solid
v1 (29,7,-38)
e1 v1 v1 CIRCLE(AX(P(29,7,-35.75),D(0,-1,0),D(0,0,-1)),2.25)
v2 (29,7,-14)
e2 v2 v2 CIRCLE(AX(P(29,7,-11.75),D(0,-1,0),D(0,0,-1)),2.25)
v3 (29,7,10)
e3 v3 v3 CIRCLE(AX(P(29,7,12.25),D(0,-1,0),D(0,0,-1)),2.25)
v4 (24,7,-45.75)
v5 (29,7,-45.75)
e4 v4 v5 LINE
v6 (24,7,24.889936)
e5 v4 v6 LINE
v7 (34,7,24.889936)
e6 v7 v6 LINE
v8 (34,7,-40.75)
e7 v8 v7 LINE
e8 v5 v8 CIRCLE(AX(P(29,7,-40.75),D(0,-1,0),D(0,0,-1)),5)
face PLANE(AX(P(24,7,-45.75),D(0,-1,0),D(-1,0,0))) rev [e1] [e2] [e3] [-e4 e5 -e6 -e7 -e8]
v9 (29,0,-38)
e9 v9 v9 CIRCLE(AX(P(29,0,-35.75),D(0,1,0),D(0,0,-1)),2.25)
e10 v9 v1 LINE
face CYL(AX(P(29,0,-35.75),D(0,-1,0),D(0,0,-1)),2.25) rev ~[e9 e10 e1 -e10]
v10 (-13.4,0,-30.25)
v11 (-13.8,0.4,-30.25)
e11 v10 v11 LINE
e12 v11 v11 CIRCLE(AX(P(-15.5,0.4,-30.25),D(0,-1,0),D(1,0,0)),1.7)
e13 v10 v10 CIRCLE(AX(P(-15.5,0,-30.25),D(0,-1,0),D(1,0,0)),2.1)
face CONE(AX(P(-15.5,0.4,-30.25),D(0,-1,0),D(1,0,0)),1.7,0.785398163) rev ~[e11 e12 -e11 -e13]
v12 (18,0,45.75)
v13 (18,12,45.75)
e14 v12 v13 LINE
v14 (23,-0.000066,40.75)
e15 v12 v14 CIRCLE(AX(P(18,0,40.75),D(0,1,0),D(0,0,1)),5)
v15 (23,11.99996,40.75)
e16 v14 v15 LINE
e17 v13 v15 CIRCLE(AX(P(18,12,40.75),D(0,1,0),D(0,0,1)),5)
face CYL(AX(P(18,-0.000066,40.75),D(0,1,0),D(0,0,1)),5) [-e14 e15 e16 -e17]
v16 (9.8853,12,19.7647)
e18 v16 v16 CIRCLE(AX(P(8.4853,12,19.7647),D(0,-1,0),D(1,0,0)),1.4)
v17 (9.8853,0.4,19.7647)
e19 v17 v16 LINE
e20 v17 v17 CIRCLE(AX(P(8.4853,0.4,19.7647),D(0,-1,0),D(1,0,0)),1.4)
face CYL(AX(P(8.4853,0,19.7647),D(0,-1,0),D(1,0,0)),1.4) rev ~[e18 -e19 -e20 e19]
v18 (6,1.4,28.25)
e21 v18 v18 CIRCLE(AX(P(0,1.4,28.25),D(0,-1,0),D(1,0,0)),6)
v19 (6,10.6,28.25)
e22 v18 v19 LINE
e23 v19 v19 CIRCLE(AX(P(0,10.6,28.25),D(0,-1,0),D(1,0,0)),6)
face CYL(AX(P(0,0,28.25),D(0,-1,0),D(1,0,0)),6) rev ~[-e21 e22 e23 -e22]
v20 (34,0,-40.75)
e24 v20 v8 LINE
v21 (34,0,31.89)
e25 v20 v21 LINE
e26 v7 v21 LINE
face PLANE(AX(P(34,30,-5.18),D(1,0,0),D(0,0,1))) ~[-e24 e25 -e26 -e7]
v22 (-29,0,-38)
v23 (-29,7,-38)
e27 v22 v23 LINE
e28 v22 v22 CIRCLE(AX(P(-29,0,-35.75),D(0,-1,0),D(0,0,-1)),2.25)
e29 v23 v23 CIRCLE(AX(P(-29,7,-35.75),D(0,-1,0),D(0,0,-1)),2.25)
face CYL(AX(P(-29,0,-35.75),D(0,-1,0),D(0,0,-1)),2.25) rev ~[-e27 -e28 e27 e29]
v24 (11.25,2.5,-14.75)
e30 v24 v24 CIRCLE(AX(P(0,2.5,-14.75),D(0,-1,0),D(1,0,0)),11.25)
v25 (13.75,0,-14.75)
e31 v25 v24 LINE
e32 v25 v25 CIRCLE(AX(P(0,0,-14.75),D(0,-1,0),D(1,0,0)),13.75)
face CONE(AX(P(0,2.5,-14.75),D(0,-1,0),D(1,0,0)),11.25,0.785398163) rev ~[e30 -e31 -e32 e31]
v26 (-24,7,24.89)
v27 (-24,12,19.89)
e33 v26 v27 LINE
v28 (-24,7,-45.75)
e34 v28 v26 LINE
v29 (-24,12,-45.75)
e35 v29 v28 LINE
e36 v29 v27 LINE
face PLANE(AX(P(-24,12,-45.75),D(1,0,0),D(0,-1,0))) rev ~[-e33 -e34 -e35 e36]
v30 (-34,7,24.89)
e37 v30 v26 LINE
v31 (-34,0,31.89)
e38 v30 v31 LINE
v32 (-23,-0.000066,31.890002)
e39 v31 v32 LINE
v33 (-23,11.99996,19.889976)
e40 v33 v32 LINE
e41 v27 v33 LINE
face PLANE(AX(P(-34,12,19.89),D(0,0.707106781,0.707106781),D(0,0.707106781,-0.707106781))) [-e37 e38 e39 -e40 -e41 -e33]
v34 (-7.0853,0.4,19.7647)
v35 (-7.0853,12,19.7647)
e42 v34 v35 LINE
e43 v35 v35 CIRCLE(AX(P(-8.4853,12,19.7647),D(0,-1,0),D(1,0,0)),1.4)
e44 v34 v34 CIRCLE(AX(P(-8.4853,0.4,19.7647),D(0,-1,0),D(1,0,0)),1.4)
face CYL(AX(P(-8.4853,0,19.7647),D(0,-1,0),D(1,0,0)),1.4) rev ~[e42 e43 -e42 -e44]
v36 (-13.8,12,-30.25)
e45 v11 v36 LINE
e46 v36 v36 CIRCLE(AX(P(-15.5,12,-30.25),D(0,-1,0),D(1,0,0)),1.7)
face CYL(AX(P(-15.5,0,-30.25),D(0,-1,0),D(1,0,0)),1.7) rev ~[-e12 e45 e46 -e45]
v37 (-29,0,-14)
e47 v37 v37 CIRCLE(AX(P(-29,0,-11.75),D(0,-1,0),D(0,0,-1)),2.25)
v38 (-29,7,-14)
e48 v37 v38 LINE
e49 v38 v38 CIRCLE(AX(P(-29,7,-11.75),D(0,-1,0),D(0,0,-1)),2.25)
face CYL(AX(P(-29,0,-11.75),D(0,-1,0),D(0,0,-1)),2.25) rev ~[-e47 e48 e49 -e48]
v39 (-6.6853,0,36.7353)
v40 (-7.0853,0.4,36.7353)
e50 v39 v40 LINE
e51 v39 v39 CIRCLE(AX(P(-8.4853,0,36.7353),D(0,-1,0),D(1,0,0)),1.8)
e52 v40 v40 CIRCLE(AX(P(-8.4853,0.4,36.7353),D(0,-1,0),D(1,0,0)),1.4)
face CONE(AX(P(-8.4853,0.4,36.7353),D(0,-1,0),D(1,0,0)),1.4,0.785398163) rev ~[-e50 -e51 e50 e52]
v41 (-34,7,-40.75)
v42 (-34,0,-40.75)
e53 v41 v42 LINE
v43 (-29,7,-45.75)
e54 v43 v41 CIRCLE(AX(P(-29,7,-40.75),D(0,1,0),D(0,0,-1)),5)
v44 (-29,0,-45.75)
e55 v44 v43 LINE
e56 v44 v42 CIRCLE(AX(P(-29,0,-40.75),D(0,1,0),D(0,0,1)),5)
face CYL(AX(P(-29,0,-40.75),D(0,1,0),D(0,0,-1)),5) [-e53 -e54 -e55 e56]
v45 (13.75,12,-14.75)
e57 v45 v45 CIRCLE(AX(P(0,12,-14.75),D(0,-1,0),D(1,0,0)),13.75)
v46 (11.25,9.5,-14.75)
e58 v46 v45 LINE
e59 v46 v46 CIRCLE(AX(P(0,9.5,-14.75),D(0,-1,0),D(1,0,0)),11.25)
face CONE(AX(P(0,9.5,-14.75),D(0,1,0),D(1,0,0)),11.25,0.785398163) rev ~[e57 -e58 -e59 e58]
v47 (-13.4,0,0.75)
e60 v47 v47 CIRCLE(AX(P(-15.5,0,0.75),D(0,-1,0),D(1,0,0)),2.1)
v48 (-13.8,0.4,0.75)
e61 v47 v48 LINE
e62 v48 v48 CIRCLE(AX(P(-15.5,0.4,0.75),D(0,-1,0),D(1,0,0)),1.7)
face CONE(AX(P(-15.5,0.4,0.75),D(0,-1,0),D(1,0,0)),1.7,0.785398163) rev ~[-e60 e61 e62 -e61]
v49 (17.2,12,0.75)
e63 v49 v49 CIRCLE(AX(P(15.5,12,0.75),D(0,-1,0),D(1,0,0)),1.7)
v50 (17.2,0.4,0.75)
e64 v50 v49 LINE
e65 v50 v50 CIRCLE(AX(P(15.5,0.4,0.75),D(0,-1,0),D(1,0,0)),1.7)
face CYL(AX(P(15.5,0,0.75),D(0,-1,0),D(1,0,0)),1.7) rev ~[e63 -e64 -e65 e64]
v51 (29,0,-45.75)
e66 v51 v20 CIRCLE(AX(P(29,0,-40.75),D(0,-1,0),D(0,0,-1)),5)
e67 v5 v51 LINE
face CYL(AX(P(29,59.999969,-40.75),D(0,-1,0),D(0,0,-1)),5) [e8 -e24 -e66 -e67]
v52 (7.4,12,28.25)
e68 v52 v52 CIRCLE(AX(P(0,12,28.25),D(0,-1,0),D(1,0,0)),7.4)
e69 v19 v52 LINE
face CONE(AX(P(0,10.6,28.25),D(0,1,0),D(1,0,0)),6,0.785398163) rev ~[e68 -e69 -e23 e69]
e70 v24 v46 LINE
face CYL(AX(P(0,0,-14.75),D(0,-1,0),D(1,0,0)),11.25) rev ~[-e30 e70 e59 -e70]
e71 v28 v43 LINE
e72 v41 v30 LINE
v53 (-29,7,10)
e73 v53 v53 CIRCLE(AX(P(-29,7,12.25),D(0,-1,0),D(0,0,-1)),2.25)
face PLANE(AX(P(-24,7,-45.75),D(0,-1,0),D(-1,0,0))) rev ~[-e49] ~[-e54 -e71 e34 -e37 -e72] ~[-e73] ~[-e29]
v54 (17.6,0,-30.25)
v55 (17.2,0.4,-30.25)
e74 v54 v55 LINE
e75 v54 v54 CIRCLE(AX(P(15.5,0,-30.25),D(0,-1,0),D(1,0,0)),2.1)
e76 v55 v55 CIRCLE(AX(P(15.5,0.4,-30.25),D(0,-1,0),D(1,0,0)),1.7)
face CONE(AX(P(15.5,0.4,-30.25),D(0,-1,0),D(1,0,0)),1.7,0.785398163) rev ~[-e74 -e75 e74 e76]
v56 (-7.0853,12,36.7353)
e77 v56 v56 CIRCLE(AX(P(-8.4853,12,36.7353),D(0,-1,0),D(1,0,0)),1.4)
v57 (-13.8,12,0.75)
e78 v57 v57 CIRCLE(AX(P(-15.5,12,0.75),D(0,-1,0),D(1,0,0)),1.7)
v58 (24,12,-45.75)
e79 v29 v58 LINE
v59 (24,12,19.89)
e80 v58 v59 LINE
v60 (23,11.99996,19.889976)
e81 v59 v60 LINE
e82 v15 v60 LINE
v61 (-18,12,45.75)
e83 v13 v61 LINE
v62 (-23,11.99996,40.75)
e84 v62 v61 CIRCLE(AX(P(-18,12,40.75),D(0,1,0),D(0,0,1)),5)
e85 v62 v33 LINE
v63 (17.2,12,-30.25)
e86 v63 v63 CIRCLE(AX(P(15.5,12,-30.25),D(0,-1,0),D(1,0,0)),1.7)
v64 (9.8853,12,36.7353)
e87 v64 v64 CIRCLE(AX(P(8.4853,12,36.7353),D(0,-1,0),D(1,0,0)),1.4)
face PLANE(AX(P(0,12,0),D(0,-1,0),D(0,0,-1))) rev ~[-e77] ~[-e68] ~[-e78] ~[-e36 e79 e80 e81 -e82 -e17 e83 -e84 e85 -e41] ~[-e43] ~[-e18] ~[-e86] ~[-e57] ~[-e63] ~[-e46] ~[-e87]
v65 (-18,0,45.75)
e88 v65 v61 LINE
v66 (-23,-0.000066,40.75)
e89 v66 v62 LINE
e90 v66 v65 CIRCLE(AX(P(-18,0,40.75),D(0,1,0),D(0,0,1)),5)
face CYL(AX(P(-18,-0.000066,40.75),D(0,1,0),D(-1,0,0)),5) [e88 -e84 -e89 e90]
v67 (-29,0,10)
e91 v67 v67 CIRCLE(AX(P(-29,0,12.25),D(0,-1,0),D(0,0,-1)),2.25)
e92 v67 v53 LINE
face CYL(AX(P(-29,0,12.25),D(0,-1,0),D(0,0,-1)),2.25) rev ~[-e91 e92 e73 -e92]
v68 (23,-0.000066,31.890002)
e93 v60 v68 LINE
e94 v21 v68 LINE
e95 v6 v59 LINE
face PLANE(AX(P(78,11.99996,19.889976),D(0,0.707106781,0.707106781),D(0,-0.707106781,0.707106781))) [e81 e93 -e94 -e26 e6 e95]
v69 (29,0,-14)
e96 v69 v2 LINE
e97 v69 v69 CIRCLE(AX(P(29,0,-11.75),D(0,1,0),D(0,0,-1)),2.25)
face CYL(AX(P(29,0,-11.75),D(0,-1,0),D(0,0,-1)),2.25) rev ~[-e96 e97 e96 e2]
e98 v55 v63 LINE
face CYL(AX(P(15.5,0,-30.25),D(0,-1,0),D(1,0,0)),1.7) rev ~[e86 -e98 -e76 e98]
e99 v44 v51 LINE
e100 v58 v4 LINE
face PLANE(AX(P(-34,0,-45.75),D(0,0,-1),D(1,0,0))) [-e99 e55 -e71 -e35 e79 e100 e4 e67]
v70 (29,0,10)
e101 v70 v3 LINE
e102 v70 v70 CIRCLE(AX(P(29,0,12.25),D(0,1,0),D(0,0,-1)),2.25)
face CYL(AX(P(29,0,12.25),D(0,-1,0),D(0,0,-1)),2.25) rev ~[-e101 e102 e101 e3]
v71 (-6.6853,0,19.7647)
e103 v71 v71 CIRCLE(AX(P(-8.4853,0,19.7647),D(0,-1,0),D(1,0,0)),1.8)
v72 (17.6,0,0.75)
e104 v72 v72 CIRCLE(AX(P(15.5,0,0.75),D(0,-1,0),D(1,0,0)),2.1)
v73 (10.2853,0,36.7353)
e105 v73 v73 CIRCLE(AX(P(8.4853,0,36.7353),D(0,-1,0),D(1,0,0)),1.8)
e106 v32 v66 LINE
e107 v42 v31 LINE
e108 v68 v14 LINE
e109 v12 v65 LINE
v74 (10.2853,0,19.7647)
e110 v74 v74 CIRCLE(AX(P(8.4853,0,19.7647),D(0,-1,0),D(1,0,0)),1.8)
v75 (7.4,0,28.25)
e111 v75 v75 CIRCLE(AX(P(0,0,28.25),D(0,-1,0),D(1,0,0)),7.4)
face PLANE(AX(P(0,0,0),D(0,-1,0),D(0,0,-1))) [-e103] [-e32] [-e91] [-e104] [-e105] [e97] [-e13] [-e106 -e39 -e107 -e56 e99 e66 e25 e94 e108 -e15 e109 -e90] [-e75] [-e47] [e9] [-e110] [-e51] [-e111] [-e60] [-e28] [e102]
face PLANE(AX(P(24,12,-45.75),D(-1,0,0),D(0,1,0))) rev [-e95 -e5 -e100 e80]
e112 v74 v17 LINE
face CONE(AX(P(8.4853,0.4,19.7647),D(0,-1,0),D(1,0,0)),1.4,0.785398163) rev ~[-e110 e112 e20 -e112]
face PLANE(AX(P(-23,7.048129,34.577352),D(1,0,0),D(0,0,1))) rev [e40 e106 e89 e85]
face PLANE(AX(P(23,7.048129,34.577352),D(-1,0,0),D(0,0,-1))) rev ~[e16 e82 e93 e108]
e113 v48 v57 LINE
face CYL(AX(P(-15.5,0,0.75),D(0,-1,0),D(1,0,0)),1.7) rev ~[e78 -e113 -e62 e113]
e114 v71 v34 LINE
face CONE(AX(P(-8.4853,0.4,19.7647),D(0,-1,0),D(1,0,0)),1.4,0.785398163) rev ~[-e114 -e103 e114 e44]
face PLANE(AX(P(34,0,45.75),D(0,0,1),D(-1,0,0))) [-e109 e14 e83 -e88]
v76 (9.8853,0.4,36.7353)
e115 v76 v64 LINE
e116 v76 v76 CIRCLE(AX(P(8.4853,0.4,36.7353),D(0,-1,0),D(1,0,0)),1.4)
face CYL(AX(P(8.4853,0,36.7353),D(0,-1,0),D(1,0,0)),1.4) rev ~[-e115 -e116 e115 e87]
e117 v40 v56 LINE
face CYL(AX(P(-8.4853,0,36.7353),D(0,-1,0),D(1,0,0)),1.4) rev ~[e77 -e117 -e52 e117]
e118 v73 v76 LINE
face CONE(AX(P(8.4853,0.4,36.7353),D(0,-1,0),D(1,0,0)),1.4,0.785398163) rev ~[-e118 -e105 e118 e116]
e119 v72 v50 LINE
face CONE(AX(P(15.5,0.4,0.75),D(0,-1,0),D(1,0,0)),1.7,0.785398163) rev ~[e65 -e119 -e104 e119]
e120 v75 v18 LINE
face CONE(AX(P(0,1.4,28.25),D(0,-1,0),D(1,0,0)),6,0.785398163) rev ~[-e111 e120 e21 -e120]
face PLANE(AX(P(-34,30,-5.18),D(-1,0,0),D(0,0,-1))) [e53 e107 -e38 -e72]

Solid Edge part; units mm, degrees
sketch "Sketch1" plane through (0, 0, 0) normal (0, -1, 0) x (1, 0, 0)
  line L0 (-34, -45.75) -> (34, -45.75)
  line L1 (34, -45.75) -> (34, 45.75)
  line L2 (34, 45.75) -> (-34, 45.75)
  line L3 (-34, 45.75) -> (-34, -45.75)
  dimension "D1" = 68
  dimension "D2" = 91.5
extrude "Protrusion1" add sketch "Sketch1" against normal blind 12
sketch "Sketch2" plane through (0, 0, 0) normal (0, -1, 0) x (1, 0, 0)
  circle A0 centre (0, -14.75) radius 11.25
  circle A1 centre (-15.5, 0.75) radius 1.7
  circle A2 centre (-15.5, -30.25) radius 1.7
  circle A3 centre (15.5, -30.25) radius 1.7
  circle A4 centre (15.5, 0.75) radius 1.7
  dimension "D1" = 22.5
  dimension "D2" = 3.4
  dimension "D3" = 31
  dimension "D4" = 31
extrude "Cutout1" cut sketch "Sketch2" against normal through all
sketch "Sketch3" plane through (0, 0, 0) normal (0, -1, 0) x (1, 0, 0)
  circle A0 centre (8.4853, 36.7353) radius 1.4
  circle A1 centre (8.4853, 19.7647) radius 1.4
  circle A2 centre (-8.4853, 19.7647) radius 1.4
  circle A3 centre (-8.4853, 36.7353) radius 1.4
  circle A4 centre (0, 28.25) radius 6
  dimension "D1" = 8.4853
extrude "Cutout2" cut sketch "Sketch3" against normal through all
sketch "Sketch4" plane through (-34, 6, 0) normal (-1, 0, 0) x (0, 0, -1)
  line L0 (-19.89, -6) -> (45.75, -71.64)
  line L1 (45.75, -71.64) -> (45.75, -6)
  line L2 (45.75, -6) -> (-19.89, -6)
  dimension "D1" = 25.86
extrude "Extrusionsausprägung_2" add sketch "Sketch4" against normal blind 10
mirror "Mirror1" about plane through (0, 0, 0) normal (1, 0, 0) of "Extrusionsausprägung_2"
sketch "Sketch5" plane through (-34, 38.82, 0) normal (-1, 0, 0) x (0, 0, -1)
  circle A0 centre (33.7465, 1.4635) radius 1.875
  circle A1 centre (19.6043, 15.6057) radius 1.875
  dimension "D1" = 3.75
  dimension "D2" = 20
  dimension "D3" = 42.14
  dimension "D4" = 32.83
extrude "Extrusionsausschnitt_3" cut sketch "Sketch5" against normal blind 14
sketch "Sketch6" plane through (-34, 38.82, 0) normal (-1, 0, 0) x (0, 0, -1)
  line L0 (45.75, -38.82) -> (-31.89, 38.82)
  line L1 (-31.89, 38.82) -> (-17.75, 38.82)
  line L2 (-17.75, 38.82) -> (45.75, -24.68)
  line L3 (45.75, -24.68) -> (45.75, -38.82)
  dimension "D1" = 14.14
extrude "Extrusionsausprägung_4" add sketch "Sketch6" along normal blind 44
mirror "Mirror2" about plane through (0, 0, 0) normal (1, 0, 0) of "Extrusionsausprägung_4"
sketch "Sketch7" plane through (-54, 31.75, -14) normal (0, -0.7071068, -0.7071068) x (1, 0, 0)
  circle A0 centre (-14, 10.2613) radius 4
  circle A1 centre (-14, -19.7387) radius 4
  dimension "D1" = 8
  dimension "D2" = 34.64
  dimension "D3" = 30
  dimension "D4" = 10
extrude "Cutout3" cut sketch "Sketch7" against normal up to next
mirror "Mirror3" about plane through (0, 0, 0) normal (1, 0, 0) of "Cutout3"
sketch "Sketch8" plane through (-78, 38.82, -6.93) normal (-1, 0, 0) x (0, 0.7071068, -0.7071068)
  line L0 (29.953, 0) -> (42.4264, 12.4734)
  dimension "D1" = 60
extrude "Cutout4" cut sketch "Sketch8" against normal through all material side at (-78, 60.05, -36.93)
sketch "Sketch9" plane through (78, 30, -5.18) normal (1, 0, 0) x (0, -0.7071068, 0.7071068)
  line L0 (30.4551, -4.9992) -> (47.4257, -4.9992)
  line L1 (47.4257, -4.9992) -> (57.2262, -14.7997)
  line L2 (57.2262, -14.7997) -> (48.7409, -23.285)
  line L3 (48.7409, -23.285) -> (30.4551, -4.9992)
extrude "Extrusionsausschnitt_6" cut sketch "Sketch9" against normal blind 55
mirror "Mirror4" about plane through (0, 0, 0) normal (1, 0, 0) of "Extrusionsausschnitt_6"
fillet "Verrundung_1" radius 5 4 edges at (23, 6, 45.75) (-23, 6, 45.75) (34, 30, -45.75) (-34, 30, -45.75)
chamfer "Chamfer1" distance 0.5 angle 45 2 edges at (-34, 23.2143, -17.7293) (-34, 37.3565, -31.8715)
chamfer "Fase_2" distance 0.4 angle 45 4 edges at (-17.2, 0, -30.25) (-17.2, 0, 0.75) (13.8, 0, 0.75) (13.8, 0, -30.25)
chamfer "Fase_3" distance 0.4 angle 45 4 edges at (-9.8853, 0, 19.7647) (-9.8853, 0, 36.7353) (7.0853, 0, 36.7353) (7.0853, 0, 19.7647)
chamfer "Fase_4" distance 2.5 angle 45 2 edges at (-11.25, 0, -14.75) (0, 12, -3.5)
chamfer "Fase_5" distance 1.4 angle 45 2 edges at (-6, 0, 28.25) (0, 12, 34.25)
chamfer "Fase_7" distance 1 angle 45 4 edges at (-68, 34.3926, -2.5026) (-68, 55.6058, -23.7158) (68, 34.3926, -2.5026) (68, 55.6058, -23.7158)
sketch "Sketch10" plane through (-78, 30, -5.18) normal (-1, 0, 0) x (0, 0.7071068, -0.7071068)
  line L0 (-30.4551, -4.9992) -> (-20.4566, 4.9992)
extrude "Extrusionsausschnitt_8" cut sketch "Sketch10" against normal blind 44 material side at (-78, 11.95, 12.82)
mirror "Mirror5" about plane through (0, 0, 0) normal (1, 0, 0) of "Extrusionsausschnitt_8"
sketch "Sketch11" plane through (-78, 36, -11.18) normal (-1, 0, 0) x (0, 0.7071068, -0.7071068)
  line L0 (-38.9404, -4.9992) -> (7.4741, 41.4152)
extrude "Cutout6" cut sketch "Sketch11" against normal through all material side at (-78, 12.05, -12.93)
sketch "Sketch12" plane through (0, 0, 0) normal (0, -1, 0) x (0, 0, -1)
  circle A0 centre (35.75, -29) radius 2.25
  circle A1 centre (11.75, -29) radius 2.25
  circle A2 centre (-12.25, -29) radius 2.25
  dimension "D1" = 4.5
  dimension "D2" = 5
  dimension "D3" = 24
  dimension "D4" = 24
  dimension "D5" = 10
extrude "Cutout7" cut sketch "Sketch12" against normal through all
mirror "Mirror6" about plane through (0, 0, 0) normal (1, 0, 0) of "Cutout7"
sketch "Sketch13" plane through (0, 6, -45.75) normal (0, 0, -1) x (1, 0, 0)
  line L0 (-34, -6) -> (-24, -6)
  line L1 (-24, -6) -> (-24, -1)
  line L2 (-24, -1) -> (-34, -1)
  line L3 (-34, -1) -> (-34, -6)
  dimension "D1" = 10
  dimension "D2" = 5
extrude "Cutout8" cut sketch "Sketch13" against normal through all
mirror "Mirror7" about plane through (0, 0, 0) normal (1, 0, 0) of "Cutout8"
properties material "Nylon, allgemein"
